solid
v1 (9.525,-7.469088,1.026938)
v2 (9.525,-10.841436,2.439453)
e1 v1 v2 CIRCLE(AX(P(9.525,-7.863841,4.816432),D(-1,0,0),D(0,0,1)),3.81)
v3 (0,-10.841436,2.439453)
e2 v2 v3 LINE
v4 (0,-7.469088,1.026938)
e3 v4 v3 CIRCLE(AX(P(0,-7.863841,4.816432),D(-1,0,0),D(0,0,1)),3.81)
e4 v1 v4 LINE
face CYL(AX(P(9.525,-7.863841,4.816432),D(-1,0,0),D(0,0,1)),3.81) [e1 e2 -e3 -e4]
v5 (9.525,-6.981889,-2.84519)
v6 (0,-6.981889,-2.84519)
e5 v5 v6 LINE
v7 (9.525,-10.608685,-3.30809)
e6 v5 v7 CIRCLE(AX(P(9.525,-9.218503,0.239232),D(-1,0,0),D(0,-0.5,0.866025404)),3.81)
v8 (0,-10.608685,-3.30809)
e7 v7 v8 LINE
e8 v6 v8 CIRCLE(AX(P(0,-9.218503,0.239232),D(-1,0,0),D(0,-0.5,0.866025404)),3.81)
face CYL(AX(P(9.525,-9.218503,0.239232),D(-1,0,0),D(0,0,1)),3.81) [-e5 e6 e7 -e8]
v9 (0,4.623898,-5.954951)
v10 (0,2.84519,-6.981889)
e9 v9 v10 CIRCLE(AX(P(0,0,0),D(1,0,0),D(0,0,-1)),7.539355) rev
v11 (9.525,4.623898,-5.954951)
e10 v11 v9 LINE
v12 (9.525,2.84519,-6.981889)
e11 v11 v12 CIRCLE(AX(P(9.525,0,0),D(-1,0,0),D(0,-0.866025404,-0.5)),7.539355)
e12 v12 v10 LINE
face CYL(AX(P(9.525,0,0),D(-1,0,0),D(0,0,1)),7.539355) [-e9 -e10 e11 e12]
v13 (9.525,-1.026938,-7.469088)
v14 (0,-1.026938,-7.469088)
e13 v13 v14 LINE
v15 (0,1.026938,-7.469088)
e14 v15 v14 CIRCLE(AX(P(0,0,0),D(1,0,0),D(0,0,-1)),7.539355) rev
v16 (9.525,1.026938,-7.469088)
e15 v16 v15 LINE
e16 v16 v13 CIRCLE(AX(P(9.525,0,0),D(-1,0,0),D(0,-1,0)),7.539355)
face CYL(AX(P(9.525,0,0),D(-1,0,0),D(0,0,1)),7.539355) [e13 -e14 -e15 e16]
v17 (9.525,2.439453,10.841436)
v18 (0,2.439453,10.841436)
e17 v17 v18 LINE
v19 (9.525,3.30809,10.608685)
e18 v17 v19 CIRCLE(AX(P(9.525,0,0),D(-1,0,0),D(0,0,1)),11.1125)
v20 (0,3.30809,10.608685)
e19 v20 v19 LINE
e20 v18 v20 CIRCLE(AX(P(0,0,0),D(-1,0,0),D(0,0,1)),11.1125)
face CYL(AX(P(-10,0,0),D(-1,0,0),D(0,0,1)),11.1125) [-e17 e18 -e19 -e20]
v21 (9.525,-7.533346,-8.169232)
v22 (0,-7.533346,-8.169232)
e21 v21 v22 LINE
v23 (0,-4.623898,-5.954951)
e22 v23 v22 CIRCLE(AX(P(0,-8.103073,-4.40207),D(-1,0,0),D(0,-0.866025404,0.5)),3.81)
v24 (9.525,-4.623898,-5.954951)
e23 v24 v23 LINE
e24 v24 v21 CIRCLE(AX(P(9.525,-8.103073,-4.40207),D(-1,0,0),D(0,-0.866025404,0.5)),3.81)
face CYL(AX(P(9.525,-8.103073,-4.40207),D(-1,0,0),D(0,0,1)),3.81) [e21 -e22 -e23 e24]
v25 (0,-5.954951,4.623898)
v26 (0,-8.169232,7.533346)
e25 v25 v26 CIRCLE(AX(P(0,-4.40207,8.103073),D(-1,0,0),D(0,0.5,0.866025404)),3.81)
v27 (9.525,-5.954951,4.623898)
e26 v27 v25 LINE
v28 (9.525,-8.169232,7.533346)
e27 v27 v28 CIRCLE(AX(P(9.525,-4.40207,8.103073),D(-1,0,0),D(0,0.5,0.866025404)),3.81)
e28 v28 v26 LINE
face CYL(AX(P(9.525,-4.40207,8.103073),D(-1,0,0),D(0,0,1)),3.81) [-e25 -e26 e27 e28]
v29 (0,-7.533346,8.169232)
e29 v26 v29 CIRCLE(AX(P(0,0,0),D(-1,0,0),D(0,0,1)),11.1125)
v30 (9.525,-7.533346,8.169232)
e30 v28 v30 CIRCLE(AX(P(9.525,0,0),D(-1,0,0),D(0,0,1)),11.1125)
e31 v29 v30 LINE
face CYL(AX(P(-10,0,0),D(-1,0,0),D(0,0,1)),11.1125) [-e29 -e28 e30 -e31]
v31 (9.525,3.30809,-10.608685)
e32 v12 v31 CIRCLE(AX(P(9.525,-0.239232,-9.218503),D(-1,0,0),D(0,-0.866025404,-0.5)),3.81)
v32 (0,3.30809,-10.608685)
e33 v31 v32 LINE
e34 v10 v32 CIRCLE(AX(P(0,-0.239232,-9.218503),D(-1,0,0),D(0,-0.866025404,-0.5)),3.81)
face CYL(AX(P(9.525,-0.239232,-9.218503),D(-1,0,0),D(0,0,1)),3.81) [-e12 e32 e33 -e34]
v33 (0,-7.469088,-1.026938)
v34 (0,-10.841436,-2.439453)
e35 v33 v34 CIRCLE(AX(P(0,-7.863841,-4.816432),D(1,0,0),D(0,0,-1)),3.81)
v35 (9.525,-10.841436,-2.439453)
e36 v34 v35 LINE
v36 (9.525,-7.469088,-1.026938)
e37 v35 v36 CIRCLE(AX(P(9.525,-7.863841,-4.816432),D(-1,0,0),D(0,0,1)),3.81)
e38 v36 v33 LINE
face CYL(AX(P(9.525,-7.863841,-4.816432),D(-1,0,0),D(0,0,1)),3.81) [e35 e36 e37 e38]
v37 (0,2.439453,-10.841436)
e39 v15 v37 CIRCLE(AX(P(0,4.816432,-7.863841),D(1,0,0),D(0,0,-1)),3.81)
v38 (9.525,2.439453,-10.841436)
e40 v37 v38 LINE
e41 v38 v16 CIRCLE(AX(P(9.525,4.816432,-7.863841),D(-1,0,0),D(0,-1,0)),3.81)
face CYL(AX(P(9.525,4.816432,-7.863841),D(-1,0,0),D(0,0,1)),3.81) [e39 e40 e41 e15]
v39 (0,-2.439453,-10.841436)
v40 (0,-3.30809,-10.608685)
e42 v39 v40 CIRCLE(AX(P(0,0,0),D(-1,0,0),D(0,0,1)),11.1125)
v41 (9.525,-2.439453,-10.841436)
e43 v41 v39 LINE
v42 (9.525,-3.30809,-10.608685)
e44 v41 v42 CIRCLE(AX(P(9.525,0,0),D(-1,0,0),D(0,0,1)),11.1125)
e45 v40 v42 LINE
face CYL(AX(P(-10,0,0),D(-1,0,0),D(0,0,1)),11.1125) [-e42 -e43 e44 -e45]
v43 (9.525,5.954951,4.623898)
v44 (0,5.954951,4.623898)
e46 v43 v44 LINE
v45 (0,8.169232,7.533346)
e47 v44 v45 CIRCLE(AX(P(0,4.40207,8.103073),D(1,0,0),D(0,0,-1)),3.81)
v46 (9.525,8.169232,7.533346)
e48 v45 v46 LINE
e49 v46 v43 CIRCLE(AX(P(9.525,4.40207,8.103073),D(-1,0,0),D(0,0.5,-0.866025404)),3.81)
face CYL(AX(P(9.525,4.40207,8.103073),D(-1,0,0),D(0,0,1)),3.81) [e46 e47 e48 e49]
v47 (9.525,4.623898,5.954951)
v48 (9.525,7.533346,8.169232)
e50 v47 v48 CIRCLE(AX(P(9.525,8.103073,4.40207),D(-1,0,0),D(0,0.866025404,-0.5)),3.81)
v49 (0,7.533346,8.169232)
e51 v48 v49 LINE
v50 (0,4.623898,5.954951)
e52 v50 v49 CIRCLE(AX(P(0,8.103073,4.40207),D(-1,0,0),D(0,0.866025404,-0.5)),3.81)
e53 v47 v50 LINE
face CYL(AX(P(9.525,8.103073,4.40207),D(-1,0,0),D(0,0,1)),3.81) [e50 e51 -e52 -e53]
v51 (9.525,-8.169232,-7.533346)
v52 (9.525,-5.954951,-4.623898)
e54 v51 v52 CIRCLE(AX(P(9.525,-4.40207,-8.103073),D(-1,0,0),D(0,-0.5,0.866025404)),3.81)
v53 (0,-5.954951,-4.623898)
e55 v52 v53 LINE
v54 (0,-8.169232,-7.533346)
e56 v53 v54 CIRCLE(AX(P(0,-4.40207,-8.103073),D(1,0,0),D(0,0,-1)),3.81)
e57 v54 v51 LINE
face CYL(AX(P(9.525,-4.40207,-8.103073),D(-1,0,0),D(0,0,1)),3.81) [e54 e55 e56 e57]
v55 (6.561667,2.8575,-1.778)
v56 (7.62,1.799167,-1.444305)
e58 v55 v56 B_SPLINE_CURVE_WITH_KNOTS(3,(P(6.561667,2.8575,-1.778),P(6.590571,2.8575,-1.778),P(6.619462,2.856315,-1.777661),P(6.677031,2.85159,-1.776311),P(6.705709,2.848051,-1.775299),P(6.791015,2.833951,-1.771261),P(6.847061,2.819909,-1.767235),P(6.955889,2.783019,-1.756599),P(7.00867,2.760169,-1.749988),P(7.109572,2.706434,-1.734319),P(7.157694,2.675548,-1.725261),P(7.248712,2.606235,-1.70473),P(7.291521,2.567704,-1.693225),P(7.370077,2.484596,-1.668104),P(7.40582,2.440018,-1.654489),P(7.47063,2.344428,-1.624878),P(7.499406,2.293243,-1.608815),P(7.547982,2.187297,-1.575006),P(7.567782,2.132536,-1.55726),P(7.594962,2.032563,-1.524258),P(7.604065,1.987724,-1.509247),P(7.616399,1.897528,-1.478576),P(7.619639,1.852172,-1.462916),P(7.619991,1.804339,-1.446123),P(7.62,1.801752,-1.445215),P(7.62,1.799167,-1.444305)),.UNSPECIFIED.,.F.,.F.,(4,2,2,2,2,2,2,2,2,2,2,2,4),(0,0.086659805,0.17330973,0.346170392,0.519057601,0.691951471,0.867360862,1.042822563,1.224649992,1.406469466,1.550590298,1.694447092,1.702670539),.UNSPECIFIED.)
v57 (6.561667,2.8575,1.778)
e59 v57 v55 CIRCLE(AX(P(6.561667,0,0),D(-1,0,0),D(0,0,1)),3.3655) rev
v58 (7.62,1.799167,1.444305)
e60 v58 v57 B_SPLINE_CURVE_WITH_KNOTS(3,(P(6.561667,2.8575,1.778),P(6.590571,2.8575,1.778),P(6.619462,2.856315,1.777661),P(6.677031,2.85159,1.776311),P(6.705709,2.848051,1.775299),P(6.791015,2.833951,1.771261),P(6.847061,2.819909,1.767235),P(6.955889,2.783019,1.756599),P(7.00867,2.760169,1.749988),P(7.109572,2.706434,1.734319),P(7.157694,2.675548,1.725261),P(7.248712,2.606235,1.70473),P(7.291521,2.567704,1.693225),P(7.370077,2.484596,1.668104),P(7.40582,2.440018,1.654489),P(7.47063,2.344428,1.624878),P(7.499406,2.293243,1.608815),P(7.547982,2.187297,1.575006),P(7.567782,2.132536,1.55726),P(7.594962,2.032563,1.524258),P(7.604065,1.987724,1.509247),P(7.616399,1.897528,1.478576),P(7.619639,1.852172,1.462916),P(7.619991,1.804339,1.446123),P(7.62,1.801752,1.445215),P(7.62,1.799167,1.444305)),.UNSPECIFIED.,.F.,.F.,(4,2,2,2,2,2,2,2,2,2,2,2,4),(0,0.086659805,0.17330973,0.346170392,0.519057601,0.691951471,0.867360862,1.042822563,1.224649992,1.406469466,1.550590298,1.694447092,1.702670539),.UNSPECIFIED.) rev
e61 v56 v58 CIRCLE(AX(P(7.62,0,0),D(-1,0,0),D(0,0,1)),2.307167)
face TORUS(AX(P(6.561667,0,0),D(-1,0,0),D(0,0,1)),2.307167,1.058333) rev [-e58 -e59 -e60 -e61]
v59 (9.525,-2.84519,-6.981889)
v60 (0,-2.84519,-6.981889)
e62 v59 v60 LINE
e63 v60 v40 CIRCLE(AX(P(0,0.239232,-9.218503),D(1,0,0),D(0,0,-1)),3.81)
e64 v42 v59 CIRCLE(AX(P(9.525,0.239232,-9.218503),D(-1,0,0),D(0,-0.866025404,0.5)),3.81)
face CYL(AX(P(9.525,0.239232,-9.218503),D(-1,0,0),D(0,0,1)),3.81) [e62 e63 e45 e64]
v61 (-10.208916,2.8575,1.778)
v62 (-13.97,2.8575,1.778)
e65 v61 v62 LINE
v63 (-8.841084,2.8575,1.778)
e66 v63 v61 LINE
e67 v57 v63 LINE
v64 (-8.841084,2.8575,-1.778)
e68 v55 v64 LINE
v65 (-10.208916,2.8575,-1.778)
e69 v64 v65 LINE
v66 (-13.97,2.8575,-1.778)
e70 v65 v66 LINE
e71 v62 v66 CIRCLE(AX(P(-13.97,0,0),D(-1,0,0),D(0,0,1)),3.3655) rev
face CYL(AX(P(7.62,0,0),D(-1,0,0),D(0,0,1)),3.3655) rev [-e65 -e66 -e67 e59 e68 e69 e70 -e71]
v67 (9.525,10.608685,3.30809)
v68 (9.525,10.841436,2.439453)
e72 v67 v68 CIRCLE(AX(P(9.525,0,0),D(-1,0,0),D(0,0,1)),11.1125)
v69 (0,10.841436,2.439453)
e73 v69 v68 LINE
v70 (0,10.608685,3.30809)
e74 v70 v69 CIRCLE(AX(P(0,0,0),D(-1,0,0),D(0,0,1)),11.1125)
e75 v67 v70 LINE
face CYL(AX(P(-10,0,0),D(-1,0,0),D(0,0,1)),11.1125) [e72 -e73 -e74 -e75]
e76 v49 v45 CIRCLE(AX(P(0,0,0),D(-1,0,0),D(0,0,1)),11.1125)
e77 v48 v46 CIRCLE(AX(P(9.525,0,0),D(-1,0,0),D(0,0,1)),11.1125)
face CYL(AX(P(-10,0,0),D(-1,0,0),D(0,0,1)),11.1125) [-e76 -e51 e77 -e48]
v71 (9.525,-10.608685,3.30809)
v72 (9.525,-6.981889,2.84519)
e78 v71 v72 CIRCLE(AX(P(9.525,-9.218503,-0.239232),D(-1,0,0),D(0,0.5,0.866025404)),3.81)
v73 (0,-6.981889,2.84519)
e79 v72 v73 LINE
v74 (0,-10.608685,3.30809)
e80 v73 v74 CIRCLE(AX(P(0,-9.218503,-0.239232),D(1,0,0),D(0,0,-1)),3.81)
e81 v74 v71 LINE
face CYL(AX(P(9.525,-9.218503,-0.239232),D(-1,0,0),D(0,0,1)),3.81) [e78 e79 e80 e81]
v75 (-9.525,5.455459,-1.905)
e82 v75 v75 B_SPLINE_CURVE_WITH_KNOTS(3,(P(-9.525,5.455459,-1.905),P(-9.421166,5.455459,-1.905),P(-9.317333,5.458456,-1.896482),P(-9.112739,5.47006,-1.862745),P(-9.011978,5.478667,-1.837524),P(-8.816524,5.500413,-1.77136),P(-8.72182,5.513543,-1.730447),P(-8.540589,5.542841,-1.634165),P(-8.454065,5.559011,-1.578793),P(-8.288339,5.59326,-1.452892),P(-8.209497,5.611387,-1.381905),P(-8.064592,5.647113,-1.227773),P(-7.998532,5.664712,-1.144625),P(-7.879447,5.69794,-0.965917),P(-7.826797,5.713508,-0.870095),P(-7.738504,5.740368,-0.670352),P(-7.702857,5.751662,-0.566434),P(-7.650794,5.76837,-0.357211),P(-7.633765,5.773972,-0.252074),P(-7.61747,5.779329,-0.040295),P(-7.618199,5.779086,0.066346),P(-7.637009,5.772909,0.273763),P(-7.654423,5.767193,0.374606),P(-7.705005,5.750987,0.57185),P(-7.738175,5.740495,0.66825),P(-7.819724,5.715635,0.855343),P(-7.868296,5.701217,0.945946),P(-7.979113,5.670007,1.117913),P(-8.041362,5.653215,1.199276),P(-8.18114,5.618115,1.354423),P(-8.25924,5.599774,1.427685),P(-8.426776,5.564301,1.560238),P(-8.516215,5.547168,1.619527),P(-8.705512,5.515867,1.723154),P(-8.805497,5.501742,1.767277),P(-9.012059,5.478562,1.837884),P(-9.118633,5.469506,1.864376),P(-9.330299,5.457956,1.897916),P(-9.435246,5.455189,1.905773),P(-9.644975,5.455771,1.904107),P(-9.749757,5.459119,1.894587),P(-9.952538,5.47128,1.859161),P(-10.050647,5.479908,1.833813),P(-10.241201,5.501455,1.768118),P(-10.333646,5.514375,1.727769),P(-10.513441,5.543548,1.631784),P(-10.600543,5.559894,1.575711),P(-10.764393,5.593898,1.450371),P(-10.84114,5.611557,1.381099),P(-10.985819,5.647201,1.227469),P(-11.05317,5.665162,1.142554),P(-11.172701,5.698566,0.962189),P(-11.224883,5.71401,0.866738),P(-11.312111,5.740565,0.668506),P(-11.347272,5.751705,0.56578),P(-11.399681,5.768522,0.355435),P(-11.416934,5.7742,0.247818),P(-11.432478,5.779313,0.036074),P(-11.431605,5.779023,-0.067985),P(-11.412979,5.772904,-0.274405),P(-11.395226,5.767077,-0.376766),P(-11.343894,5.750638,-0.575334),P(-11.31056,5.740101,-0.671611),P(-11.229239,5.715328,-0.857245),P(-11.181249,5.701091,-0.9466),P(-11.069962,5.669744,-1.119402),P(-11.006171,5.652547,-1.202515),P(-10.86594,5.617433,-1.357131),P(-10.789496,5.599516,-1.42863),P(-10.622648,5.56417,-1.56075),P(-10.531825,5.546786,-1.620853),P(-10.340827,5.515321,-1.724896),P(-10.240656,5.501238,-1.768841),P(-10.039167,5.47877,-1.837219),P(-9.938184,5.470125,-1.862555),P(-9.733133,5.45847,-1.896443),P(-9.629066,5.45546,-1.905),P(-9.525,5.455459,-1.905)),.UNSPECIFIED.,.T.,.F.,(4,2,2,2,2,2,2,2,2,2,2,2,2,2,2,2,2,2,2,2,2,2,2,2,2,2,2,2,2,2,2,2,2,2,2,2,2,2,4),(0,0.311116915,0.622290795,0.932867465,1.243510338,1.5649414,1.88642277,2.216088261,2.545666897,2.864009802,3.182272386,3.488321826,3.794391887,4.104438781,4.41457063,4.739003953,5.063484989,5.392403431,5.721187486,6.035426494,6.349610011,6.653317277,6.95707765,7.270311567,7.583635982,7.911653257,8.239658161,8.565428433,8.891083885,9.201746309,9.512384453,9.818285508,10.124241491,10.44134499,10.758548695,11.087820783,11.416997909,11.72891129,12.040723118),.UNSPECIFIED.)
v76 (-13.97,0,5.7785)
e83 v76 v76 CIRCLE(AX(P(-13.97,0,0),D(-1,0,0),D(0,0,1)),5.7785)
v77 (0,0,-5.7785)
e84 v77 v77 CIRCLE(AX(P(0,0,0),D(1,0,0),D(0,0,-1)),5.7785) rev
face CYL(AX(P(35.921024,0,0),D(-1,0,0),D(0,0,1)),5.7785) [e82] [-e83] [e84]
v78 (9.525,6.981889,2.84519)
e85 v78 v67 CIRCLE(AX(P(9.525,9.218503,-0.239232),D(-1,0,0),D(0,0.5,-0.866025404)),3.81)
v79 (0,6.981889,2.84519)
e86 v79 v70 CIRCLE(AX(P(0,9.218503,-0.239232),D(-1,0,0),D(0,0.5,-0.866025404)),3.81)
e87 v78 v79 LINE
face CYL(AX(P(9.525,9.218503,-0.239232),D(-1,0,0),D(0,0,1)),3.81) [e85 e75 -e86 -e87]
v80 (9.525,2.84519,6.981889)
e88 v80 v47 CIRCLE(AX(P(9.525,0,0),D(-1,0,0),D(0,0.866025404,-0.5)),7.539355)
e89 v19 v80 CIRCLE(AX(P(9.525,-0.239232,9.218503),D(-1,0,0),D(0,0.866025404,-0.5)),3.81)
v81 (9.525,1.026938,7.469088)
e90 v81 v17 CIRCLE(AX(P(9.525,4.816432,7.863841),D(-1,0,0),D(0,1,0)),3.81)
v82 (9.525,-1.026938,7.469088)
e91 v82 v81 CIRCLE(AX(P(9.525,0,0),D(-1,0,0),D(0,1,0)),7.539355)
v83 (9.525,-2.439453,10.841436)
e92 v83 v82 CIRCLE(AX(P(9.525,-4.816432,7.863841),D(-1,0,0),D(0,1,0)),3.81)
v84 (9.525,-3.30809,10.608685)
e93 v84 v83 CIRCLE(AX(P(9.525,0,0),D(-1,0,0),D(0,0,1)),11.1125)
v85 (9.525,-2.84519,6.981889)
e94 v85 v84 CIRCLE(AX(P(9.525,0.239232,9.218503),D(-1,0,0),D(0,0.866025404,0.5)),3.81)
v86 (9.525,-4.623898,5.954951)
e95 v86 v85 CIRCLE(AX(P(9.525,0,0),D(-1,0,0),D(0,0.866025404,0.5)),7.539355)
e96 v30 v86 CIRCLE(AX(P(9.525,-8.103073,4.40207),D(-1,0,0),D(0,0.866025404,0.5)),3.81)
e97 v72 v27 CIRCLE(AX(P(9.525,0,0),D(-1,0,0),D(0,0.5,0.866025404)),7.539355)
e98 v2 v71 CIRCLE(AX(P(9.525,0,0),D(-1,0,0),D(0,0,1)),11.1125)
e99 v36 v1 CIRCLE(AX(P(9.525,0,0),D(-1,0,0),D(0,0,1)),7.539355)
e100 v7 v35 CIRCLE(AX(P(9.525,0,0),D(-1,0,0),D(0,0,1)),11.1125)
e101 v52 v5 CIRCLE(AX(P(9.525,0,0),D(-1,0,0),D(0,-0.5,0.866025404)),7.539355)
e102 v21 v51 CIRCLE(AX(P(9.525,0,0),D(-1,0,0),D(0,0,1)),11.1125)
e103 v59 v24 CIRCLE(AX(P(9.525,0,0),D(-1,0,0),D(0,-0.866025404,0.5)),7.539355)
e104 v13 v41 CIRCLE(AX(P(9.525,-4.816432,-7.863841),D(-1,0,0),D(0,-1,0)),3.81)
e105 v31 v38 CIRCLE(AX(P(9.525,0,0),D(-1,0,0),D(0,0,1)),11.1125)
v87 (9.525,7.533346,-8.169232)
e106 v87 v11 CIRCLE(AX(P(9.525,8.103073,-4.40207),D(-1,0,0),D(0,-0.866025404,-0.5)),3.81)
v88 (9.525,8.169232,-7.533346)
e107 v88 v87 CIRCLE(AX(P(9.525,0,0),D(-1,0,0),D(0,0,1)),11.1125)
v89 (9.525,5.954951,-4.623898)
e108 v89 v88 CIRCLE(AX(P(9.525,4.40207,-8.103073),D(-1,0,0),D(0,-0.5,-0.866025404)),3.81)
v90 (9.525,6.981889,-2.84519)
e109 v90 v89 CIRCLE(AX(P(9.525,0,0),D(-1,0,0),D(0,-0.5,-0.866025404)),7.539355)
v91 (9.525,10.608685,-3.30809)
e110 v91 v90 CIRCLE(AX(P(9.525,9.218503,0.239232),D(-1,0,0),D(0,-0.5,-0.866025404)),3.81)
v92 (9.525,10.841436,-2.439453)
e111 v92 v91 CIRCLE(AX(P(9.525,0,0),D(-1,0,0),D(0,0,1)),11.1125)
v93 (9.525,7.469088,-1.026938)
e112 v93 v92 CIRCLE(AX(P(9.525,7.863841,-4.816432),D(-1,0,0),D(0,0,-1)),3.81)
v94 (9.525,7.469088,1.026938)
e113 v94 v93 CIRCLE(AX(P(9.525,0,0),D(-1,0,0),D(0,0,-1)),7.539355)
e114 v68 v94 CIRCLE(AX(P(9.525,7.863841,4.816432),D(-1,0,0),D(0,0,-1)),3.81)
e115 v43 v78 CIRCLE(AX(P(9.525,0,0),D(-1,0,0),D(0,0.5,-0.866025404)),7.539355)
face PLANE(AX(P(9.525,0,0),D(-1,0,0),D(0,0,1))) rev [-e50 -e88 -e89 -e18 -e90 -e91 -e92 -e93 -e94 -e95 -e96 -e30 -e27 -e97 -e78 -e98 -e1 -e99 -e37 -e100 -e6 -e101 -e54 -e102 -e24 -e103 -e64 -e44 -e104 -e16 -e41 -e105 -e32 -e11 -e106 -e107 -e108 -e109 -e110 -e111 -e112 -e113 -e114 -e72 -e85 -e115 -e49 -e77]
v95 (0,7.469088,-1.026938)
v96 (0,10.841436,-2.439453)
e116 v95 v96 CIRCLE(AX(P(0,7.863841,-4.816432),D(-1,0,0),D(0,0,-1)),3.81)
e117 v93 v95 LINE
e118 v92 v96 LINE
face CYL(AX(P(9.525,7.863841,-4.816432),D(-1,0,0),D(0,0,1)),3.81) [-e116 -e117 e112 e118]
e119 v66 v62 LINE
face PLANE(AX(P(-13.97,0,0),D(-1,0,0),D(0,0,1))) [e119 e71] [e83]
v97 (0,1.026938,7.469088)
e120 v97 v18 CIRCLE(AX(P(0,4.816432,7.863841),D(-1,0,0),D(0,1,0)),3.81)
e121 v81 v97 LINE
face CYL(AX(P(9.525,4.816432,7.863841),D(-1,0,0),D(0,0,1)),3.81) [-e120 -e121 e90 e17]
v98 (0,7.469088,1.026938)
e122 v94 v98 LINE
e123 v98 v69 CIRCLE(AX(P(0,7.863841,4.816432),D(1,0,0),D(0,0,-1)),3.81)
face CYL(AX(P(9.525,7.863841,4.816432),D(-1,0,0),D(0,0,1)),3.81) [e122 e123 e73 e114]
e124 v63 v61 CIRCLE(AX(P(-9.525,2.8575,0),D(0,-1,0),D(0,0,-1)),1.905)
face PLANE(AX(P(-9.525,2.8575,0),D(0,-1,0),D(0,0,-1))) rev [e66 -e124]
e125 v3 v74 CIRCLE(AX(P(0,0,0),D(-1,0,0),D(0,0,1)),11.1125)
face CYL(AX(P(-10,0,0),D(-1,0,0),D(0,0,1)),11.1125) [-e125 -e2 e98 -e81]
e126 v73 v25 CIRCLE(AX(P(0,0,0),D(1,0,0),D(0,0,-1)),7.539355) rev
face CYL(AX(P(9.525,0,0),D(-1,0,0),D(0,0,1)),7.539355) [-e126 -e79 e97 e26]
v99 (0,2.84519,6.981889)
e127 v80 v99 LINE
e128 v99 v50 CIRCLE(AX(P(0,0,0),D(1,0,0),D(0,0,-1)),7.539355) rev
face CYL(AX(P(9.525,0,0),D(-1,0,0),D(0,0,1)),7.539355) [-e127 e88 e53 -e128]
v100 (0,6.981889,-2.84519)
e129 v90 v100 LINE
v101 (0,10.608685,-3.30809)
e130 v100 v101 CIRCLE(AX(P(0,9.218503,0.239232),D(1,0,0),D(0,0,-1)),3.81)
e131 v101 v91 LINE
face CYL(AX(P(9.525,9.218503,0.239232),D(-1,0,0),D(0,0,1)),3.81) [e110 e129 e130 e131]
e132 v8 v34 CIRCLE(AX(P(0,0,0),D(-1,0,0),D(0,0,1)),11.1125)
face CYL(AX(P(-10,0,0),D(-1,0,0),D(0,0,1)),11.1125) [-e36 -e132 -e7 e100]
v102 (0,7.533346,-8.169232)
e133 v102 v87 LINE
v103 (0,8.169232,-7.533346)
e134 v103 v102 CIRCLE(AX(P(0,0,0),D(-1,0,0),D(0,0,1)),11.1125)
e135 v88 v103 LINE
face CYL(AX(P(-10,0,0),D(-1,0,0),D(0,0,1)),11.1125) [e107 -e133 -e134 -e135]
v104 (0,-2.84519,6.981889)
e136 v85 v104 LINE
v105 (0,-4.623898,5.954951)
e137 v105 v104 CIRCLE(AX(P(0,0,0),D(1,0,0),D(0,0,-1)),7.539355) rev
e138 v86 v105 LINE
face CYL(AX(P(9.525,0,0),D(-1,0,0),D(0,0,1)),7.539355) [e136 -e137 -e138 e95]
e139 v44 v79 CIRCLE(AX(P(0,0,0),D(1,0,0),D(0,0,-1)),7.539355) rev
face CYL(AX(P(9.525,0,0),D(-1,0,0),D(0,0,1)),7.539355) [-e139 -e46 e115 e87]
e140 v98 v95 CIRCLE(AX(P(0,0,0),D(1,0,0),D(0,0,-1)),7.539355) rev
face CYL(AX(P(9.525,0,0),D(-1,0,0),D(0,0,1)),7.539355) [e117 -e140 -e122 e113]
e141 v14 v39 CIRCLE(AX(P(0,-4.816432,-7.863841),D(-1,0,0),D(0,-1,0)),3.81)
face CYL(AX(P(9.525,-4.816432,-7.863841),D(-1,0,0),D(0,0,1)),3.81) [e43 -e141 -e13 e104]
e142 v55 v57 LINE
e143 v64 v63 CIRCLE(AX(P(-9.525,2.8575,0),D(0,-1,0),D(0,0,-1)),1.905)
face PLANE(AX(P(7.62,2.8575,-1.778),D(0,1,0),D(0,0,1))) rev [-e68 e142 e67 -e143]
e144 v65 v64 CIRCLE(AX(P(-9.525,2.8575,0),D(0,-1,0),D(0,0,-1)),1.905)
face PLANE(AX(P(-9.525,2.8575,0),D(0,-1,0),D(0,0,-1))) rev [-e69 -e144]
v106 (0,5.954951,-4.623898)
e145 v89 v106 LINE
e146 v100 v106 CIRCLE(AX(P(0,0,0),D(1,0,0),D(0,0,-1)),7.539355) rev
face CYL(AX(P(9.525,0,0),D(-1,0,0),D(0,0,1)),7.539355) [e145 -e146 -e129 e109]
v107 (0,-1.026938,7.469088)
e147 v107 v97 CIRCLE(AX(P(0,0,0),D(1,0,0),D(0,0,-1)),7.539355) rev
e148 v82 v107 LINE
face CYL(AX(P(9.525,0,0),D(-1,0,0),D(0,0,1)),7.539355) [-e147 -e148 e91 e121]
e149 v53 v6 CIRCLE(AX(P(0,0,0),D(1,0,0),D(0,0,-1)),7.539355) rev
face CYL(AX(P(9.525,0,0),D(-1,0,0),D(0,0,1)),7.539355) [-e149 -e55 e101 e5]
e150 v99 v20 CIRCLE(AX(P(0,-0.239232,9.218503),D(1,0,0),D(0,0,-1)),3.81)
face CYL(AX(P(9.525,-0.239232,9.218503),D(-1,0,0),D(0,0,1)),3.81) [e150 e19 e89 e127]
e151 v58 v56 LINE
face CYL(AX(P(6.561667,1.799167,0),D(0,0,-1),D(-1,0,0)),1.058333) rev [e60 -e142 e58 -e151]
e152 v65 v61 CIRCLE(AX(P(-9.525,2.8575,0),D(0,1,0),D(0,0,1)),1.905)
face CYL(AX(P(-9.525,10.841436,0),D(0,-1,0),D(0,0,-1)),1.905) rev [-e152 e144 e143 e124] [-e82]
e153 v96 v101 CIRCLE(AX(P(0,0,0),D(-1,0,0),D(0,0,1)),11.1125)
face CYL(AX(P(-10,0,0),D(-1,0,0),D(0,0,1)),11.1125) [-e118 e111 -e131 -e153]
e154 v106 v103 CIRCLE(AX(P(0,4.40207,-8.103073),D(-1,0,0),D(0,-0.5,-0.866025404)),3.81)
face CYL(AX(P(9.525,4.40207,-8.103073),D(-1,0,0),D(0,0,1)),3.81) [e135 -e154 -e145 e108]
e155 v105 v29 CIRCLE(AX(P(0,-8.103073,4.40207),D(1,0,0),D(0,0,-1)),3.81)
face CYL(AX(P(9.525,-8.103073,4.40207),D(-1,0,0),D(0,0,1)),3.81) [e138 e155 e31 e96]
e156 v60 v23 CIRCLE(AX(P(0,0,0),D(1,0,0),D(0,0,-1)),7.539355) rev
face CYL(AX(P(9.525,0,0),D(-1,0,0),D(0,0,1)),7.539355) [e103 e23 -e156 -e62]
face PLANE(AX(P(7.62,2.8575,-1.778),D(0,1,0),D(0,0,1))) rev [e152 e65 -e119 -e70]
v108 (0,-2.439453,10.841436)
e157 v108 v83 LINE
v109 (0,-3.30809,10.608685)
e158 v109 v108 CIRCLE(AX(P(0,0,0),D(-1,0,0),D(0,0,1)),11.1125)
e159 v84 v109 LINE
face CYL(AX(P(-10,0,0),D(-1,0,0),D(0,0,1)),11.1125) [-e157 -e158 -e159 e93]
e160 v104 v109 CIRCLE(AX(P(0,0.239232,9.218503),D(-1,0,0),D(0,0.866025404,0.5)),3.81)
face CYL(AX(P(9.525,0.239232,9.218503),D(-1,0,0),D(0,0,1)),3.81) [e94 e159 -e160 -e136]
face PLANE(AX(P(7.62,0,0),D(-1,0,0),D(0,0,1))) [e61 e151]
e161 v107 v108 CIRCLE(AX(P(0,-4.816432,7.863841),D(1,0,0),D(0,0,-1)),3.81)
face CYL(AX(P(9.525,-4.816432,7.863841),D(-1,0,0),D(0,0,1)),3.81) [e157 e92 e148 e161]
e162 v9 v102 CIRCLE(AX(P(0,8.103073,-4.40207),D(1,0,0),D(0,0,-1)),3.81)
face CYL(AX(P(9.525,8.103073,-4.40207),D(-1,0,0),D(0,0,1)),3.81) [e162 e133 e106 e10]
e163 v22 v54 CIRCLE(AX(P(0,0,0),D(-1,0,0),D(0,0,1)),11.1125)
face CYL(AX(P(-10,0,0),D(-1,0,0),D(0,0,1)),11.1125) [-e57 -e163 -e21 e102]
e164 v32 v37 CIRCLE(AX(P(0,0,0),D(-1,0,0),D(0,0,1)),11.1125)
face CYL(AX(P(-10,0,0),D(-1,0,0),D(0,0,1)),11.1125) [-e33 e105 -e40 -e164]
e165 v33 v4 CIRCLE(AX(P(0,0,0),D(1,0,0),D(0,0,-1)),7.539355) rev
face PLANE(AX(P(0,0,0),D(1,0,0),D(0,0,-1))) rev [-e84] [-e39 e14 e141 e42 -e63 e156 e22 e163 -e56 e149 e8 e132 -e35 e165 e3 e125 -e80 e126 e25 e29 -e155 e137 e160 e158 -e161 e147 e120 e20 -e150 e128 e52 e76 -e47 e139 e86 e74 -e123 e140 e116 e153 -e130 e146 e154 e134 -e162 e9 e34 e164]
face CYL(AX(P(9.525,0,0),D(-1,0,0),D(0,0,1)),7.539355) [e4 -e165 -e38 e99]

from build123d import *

# Parameters (mm, degrees)
BASPROSKE_W         = 9.525
BASPROSKE_H         = 11.1125
TOOTHCUT_DEPTH      = 19.376641083
TEETHCUTS_COUNT     = 12
BORSKE_R            = 3.175
BORE_DEPTH          = 9.525
BOSS_EXTRUDE1_START = -25.4
SKETCH2_R           = 7.539355
BOSS_EXTRUDE1_DEPTH = 25.4
CUT_EXTRUDE1_DEPTH  = 23.495
SKETCH5_R           = 1.905
CUT_EXTRUDE2_DEPTH  = 24.605363577
SKETCH6_R           = 12.7
SKETCH6_R_2         = 5.7785
CUT_EXTRUDE3_DEPTH  = 15.875
SKETCH7_R           = 5.7785
CUT_EXTRUDE5_DEPTH  = 1.905
FILLET1_R           = 1.058333333


with BuildPart() as part:
    # BasProSke → Base-Revolve (revolve)
    with BuildSketch(Plane(origin=(0, 0, 0), x_dir=(1, 0, 0), z_dir=(0, 1, 0)), mode=Mode.PRIVATE) as base_revolve_sk:
        with Locations((4.7625, 5.55625)):
            Rectangle(BASPROSKE_W, BASPROSKE_H)
    revolve(base_revolve_sk.sketch.rotate(Axis((-10, 0, 0), (1, 0, 0)), 180), axis=Axis((-10, 0, 0), (1, 0, 0)))

    # TooCutSke → ToothCut (cut, through all)
    with BuildSketch(Plane(origin=(0, 0, 0), x_dir=(0, 0, -1), z_dir=(1, 0, 0))):
        with BuildLine():
            ThreePointArc((1.026937745, 7.469087808), (0, 7.539355), (-1.026937745, 7.469087808))
            ThreePointArc((-1.026937745, 7.469087808), (-1.30857978, 9.35080814), (-2.465050847, 10.861691431))
            ThreePointArc((-2.465050847, 10.861691431), (0, 11.1379), (2.465050847, 10.861691431))
            ThreePointArc((2.465050847, 10.861691431), (1.30857978, 9.35080814), (1.026937745, 7.469087808))
        make_face()
    toothcut = extrude(amount=TOOTHCUT_DEPTH, mode=Mode.SUBTRACT)

    # TeethCuts: ToothCut ×12 about axis
    teethcuts_axis = Axis((0, 0, 0), (1, 0, 0))
    for i in range(1, TEETHCUTS_COUNT):
        add(toothcut.rotate(teethcuts_axis, i * 360 / TEETHCUTS_COUNT), mode=Mode.SUBTRACT)

    # BorSke → Bore (cut, symmetric)
    with BuildSketch(Plane(origin=(0, 0, 0), x_dir=(0, 0, -1), z_dir=(1, 0, 0))):
        with Locations(Location((0, 0, 0), (0, 0, 180))):
            Circle(BORSKE_R)
    extrude(amount=BORE_DEPTH, both=True, mode=Mode.SUBTRACT)

    # Sketch2 → Boss-Extrude1 (add)
    with BuildSketch(Plane(origin=(9.525, 0, 0), x_dir=(0, 0, -1), z_dir=(1, 0, 0)).offset(BOSS_EXTRUDE1_START)):
        with Locations(Location((0, 0, 0), (0, 0, 172.171388978))):
            Circle(SKETCH2_R)
    extrude(amount=BOSS_EXTRUDE1_DEPTH)

    # Sketch3 → Cut-Extrude1 (cut)
    with BuildSketch(Plane.ZY.offset(15.875)):
        with BuildLine():
            Line((-1.778, 2.8575), (1.778, 2.8575))
            ThreePointArc((1.778, 2.8575), (0, -3.3655), (-1.778, 2.8575))
        make_face()
    extrude(amount=-CUT_EXTRUDE1_DEPTH, mode=Mode.SUBTRACT)

    # Sketch5 → Cut-Extrude2 (cut, through all)
    with BuildSketch(Plane.XZ.offset(-2.8575)):
        with Locations(Location((-9.525, 0, 0), (0, 0, 270))):
            Circle(SKETCH5_R)
    extrude(amount=-CUT_EXTRUDE2_DEPTH, mode=Mode.SUBTRACT)

    # Sketch6 → Cut-Extrude3 (cut)
    with BuildSketch(Plane.ZY.offset(15.875)):
        Circle(SKETCH6_R)
        Circle(SKETCH6_R_2, mode=Mode.SUBTRACT)
    extrude(amount=-CUT_EXTRUDE3_DEPTH, mode=Mode.SUBTRACT)

    # Sketch7 → Cut-Extrude5 (cut)
    with BuildSketch(Plane.ZY.offset(15.875)):
        Circle(SKETCH7_R)
    extrude(amount=-CUT_EXTRUDE5_DEPTH, mode=Mode.SUBTRACT)

    # Fillet1
    # the kernel refuses this fillet: 1.058333333 mm, written as the material it adds along each edge
    with BuildSketch(Plane(origin=(7.62, 0, 0), x_dir=(0, 0.9999950652018581, 0.0031415874858805883), z_dir=(0, 0.0031415874858805883, -0.9999950652018581))) as fillet1_piece_1:
        with BuildLine():
            CenterArc((3.3655 - FILLET1_R, -FILLET1_R), FILLET1_R, 0, 90)
            Line((3.3655 - FILLET1_R, 0), (3.3655, 0))
            Line((3.3655, 0), (3.3655, -FILLET1_R))
        make_face()
    revolve(axis=Axis((7.62, 0, 0), (1, 0, 0)), revolution_arc=359.64)
    with BuildSketch(Plane(origin=(7.62, 2.8575, -4.423833333), x_dir=(-1, 0, 0), z_dir=(0, 0, 1))) as fillet1_piece_2:
        with BuildLine():
            CenterArc((FILLET1_R, FILLET1_R), FILLET1_R, 180, 90)
            Line((0, FILLET1_R), (0, 0))
            Line((0, 0), (FILLET1_R, 0))
        make_face()
    extrude(amount=8.847666667)


solid = part.part
